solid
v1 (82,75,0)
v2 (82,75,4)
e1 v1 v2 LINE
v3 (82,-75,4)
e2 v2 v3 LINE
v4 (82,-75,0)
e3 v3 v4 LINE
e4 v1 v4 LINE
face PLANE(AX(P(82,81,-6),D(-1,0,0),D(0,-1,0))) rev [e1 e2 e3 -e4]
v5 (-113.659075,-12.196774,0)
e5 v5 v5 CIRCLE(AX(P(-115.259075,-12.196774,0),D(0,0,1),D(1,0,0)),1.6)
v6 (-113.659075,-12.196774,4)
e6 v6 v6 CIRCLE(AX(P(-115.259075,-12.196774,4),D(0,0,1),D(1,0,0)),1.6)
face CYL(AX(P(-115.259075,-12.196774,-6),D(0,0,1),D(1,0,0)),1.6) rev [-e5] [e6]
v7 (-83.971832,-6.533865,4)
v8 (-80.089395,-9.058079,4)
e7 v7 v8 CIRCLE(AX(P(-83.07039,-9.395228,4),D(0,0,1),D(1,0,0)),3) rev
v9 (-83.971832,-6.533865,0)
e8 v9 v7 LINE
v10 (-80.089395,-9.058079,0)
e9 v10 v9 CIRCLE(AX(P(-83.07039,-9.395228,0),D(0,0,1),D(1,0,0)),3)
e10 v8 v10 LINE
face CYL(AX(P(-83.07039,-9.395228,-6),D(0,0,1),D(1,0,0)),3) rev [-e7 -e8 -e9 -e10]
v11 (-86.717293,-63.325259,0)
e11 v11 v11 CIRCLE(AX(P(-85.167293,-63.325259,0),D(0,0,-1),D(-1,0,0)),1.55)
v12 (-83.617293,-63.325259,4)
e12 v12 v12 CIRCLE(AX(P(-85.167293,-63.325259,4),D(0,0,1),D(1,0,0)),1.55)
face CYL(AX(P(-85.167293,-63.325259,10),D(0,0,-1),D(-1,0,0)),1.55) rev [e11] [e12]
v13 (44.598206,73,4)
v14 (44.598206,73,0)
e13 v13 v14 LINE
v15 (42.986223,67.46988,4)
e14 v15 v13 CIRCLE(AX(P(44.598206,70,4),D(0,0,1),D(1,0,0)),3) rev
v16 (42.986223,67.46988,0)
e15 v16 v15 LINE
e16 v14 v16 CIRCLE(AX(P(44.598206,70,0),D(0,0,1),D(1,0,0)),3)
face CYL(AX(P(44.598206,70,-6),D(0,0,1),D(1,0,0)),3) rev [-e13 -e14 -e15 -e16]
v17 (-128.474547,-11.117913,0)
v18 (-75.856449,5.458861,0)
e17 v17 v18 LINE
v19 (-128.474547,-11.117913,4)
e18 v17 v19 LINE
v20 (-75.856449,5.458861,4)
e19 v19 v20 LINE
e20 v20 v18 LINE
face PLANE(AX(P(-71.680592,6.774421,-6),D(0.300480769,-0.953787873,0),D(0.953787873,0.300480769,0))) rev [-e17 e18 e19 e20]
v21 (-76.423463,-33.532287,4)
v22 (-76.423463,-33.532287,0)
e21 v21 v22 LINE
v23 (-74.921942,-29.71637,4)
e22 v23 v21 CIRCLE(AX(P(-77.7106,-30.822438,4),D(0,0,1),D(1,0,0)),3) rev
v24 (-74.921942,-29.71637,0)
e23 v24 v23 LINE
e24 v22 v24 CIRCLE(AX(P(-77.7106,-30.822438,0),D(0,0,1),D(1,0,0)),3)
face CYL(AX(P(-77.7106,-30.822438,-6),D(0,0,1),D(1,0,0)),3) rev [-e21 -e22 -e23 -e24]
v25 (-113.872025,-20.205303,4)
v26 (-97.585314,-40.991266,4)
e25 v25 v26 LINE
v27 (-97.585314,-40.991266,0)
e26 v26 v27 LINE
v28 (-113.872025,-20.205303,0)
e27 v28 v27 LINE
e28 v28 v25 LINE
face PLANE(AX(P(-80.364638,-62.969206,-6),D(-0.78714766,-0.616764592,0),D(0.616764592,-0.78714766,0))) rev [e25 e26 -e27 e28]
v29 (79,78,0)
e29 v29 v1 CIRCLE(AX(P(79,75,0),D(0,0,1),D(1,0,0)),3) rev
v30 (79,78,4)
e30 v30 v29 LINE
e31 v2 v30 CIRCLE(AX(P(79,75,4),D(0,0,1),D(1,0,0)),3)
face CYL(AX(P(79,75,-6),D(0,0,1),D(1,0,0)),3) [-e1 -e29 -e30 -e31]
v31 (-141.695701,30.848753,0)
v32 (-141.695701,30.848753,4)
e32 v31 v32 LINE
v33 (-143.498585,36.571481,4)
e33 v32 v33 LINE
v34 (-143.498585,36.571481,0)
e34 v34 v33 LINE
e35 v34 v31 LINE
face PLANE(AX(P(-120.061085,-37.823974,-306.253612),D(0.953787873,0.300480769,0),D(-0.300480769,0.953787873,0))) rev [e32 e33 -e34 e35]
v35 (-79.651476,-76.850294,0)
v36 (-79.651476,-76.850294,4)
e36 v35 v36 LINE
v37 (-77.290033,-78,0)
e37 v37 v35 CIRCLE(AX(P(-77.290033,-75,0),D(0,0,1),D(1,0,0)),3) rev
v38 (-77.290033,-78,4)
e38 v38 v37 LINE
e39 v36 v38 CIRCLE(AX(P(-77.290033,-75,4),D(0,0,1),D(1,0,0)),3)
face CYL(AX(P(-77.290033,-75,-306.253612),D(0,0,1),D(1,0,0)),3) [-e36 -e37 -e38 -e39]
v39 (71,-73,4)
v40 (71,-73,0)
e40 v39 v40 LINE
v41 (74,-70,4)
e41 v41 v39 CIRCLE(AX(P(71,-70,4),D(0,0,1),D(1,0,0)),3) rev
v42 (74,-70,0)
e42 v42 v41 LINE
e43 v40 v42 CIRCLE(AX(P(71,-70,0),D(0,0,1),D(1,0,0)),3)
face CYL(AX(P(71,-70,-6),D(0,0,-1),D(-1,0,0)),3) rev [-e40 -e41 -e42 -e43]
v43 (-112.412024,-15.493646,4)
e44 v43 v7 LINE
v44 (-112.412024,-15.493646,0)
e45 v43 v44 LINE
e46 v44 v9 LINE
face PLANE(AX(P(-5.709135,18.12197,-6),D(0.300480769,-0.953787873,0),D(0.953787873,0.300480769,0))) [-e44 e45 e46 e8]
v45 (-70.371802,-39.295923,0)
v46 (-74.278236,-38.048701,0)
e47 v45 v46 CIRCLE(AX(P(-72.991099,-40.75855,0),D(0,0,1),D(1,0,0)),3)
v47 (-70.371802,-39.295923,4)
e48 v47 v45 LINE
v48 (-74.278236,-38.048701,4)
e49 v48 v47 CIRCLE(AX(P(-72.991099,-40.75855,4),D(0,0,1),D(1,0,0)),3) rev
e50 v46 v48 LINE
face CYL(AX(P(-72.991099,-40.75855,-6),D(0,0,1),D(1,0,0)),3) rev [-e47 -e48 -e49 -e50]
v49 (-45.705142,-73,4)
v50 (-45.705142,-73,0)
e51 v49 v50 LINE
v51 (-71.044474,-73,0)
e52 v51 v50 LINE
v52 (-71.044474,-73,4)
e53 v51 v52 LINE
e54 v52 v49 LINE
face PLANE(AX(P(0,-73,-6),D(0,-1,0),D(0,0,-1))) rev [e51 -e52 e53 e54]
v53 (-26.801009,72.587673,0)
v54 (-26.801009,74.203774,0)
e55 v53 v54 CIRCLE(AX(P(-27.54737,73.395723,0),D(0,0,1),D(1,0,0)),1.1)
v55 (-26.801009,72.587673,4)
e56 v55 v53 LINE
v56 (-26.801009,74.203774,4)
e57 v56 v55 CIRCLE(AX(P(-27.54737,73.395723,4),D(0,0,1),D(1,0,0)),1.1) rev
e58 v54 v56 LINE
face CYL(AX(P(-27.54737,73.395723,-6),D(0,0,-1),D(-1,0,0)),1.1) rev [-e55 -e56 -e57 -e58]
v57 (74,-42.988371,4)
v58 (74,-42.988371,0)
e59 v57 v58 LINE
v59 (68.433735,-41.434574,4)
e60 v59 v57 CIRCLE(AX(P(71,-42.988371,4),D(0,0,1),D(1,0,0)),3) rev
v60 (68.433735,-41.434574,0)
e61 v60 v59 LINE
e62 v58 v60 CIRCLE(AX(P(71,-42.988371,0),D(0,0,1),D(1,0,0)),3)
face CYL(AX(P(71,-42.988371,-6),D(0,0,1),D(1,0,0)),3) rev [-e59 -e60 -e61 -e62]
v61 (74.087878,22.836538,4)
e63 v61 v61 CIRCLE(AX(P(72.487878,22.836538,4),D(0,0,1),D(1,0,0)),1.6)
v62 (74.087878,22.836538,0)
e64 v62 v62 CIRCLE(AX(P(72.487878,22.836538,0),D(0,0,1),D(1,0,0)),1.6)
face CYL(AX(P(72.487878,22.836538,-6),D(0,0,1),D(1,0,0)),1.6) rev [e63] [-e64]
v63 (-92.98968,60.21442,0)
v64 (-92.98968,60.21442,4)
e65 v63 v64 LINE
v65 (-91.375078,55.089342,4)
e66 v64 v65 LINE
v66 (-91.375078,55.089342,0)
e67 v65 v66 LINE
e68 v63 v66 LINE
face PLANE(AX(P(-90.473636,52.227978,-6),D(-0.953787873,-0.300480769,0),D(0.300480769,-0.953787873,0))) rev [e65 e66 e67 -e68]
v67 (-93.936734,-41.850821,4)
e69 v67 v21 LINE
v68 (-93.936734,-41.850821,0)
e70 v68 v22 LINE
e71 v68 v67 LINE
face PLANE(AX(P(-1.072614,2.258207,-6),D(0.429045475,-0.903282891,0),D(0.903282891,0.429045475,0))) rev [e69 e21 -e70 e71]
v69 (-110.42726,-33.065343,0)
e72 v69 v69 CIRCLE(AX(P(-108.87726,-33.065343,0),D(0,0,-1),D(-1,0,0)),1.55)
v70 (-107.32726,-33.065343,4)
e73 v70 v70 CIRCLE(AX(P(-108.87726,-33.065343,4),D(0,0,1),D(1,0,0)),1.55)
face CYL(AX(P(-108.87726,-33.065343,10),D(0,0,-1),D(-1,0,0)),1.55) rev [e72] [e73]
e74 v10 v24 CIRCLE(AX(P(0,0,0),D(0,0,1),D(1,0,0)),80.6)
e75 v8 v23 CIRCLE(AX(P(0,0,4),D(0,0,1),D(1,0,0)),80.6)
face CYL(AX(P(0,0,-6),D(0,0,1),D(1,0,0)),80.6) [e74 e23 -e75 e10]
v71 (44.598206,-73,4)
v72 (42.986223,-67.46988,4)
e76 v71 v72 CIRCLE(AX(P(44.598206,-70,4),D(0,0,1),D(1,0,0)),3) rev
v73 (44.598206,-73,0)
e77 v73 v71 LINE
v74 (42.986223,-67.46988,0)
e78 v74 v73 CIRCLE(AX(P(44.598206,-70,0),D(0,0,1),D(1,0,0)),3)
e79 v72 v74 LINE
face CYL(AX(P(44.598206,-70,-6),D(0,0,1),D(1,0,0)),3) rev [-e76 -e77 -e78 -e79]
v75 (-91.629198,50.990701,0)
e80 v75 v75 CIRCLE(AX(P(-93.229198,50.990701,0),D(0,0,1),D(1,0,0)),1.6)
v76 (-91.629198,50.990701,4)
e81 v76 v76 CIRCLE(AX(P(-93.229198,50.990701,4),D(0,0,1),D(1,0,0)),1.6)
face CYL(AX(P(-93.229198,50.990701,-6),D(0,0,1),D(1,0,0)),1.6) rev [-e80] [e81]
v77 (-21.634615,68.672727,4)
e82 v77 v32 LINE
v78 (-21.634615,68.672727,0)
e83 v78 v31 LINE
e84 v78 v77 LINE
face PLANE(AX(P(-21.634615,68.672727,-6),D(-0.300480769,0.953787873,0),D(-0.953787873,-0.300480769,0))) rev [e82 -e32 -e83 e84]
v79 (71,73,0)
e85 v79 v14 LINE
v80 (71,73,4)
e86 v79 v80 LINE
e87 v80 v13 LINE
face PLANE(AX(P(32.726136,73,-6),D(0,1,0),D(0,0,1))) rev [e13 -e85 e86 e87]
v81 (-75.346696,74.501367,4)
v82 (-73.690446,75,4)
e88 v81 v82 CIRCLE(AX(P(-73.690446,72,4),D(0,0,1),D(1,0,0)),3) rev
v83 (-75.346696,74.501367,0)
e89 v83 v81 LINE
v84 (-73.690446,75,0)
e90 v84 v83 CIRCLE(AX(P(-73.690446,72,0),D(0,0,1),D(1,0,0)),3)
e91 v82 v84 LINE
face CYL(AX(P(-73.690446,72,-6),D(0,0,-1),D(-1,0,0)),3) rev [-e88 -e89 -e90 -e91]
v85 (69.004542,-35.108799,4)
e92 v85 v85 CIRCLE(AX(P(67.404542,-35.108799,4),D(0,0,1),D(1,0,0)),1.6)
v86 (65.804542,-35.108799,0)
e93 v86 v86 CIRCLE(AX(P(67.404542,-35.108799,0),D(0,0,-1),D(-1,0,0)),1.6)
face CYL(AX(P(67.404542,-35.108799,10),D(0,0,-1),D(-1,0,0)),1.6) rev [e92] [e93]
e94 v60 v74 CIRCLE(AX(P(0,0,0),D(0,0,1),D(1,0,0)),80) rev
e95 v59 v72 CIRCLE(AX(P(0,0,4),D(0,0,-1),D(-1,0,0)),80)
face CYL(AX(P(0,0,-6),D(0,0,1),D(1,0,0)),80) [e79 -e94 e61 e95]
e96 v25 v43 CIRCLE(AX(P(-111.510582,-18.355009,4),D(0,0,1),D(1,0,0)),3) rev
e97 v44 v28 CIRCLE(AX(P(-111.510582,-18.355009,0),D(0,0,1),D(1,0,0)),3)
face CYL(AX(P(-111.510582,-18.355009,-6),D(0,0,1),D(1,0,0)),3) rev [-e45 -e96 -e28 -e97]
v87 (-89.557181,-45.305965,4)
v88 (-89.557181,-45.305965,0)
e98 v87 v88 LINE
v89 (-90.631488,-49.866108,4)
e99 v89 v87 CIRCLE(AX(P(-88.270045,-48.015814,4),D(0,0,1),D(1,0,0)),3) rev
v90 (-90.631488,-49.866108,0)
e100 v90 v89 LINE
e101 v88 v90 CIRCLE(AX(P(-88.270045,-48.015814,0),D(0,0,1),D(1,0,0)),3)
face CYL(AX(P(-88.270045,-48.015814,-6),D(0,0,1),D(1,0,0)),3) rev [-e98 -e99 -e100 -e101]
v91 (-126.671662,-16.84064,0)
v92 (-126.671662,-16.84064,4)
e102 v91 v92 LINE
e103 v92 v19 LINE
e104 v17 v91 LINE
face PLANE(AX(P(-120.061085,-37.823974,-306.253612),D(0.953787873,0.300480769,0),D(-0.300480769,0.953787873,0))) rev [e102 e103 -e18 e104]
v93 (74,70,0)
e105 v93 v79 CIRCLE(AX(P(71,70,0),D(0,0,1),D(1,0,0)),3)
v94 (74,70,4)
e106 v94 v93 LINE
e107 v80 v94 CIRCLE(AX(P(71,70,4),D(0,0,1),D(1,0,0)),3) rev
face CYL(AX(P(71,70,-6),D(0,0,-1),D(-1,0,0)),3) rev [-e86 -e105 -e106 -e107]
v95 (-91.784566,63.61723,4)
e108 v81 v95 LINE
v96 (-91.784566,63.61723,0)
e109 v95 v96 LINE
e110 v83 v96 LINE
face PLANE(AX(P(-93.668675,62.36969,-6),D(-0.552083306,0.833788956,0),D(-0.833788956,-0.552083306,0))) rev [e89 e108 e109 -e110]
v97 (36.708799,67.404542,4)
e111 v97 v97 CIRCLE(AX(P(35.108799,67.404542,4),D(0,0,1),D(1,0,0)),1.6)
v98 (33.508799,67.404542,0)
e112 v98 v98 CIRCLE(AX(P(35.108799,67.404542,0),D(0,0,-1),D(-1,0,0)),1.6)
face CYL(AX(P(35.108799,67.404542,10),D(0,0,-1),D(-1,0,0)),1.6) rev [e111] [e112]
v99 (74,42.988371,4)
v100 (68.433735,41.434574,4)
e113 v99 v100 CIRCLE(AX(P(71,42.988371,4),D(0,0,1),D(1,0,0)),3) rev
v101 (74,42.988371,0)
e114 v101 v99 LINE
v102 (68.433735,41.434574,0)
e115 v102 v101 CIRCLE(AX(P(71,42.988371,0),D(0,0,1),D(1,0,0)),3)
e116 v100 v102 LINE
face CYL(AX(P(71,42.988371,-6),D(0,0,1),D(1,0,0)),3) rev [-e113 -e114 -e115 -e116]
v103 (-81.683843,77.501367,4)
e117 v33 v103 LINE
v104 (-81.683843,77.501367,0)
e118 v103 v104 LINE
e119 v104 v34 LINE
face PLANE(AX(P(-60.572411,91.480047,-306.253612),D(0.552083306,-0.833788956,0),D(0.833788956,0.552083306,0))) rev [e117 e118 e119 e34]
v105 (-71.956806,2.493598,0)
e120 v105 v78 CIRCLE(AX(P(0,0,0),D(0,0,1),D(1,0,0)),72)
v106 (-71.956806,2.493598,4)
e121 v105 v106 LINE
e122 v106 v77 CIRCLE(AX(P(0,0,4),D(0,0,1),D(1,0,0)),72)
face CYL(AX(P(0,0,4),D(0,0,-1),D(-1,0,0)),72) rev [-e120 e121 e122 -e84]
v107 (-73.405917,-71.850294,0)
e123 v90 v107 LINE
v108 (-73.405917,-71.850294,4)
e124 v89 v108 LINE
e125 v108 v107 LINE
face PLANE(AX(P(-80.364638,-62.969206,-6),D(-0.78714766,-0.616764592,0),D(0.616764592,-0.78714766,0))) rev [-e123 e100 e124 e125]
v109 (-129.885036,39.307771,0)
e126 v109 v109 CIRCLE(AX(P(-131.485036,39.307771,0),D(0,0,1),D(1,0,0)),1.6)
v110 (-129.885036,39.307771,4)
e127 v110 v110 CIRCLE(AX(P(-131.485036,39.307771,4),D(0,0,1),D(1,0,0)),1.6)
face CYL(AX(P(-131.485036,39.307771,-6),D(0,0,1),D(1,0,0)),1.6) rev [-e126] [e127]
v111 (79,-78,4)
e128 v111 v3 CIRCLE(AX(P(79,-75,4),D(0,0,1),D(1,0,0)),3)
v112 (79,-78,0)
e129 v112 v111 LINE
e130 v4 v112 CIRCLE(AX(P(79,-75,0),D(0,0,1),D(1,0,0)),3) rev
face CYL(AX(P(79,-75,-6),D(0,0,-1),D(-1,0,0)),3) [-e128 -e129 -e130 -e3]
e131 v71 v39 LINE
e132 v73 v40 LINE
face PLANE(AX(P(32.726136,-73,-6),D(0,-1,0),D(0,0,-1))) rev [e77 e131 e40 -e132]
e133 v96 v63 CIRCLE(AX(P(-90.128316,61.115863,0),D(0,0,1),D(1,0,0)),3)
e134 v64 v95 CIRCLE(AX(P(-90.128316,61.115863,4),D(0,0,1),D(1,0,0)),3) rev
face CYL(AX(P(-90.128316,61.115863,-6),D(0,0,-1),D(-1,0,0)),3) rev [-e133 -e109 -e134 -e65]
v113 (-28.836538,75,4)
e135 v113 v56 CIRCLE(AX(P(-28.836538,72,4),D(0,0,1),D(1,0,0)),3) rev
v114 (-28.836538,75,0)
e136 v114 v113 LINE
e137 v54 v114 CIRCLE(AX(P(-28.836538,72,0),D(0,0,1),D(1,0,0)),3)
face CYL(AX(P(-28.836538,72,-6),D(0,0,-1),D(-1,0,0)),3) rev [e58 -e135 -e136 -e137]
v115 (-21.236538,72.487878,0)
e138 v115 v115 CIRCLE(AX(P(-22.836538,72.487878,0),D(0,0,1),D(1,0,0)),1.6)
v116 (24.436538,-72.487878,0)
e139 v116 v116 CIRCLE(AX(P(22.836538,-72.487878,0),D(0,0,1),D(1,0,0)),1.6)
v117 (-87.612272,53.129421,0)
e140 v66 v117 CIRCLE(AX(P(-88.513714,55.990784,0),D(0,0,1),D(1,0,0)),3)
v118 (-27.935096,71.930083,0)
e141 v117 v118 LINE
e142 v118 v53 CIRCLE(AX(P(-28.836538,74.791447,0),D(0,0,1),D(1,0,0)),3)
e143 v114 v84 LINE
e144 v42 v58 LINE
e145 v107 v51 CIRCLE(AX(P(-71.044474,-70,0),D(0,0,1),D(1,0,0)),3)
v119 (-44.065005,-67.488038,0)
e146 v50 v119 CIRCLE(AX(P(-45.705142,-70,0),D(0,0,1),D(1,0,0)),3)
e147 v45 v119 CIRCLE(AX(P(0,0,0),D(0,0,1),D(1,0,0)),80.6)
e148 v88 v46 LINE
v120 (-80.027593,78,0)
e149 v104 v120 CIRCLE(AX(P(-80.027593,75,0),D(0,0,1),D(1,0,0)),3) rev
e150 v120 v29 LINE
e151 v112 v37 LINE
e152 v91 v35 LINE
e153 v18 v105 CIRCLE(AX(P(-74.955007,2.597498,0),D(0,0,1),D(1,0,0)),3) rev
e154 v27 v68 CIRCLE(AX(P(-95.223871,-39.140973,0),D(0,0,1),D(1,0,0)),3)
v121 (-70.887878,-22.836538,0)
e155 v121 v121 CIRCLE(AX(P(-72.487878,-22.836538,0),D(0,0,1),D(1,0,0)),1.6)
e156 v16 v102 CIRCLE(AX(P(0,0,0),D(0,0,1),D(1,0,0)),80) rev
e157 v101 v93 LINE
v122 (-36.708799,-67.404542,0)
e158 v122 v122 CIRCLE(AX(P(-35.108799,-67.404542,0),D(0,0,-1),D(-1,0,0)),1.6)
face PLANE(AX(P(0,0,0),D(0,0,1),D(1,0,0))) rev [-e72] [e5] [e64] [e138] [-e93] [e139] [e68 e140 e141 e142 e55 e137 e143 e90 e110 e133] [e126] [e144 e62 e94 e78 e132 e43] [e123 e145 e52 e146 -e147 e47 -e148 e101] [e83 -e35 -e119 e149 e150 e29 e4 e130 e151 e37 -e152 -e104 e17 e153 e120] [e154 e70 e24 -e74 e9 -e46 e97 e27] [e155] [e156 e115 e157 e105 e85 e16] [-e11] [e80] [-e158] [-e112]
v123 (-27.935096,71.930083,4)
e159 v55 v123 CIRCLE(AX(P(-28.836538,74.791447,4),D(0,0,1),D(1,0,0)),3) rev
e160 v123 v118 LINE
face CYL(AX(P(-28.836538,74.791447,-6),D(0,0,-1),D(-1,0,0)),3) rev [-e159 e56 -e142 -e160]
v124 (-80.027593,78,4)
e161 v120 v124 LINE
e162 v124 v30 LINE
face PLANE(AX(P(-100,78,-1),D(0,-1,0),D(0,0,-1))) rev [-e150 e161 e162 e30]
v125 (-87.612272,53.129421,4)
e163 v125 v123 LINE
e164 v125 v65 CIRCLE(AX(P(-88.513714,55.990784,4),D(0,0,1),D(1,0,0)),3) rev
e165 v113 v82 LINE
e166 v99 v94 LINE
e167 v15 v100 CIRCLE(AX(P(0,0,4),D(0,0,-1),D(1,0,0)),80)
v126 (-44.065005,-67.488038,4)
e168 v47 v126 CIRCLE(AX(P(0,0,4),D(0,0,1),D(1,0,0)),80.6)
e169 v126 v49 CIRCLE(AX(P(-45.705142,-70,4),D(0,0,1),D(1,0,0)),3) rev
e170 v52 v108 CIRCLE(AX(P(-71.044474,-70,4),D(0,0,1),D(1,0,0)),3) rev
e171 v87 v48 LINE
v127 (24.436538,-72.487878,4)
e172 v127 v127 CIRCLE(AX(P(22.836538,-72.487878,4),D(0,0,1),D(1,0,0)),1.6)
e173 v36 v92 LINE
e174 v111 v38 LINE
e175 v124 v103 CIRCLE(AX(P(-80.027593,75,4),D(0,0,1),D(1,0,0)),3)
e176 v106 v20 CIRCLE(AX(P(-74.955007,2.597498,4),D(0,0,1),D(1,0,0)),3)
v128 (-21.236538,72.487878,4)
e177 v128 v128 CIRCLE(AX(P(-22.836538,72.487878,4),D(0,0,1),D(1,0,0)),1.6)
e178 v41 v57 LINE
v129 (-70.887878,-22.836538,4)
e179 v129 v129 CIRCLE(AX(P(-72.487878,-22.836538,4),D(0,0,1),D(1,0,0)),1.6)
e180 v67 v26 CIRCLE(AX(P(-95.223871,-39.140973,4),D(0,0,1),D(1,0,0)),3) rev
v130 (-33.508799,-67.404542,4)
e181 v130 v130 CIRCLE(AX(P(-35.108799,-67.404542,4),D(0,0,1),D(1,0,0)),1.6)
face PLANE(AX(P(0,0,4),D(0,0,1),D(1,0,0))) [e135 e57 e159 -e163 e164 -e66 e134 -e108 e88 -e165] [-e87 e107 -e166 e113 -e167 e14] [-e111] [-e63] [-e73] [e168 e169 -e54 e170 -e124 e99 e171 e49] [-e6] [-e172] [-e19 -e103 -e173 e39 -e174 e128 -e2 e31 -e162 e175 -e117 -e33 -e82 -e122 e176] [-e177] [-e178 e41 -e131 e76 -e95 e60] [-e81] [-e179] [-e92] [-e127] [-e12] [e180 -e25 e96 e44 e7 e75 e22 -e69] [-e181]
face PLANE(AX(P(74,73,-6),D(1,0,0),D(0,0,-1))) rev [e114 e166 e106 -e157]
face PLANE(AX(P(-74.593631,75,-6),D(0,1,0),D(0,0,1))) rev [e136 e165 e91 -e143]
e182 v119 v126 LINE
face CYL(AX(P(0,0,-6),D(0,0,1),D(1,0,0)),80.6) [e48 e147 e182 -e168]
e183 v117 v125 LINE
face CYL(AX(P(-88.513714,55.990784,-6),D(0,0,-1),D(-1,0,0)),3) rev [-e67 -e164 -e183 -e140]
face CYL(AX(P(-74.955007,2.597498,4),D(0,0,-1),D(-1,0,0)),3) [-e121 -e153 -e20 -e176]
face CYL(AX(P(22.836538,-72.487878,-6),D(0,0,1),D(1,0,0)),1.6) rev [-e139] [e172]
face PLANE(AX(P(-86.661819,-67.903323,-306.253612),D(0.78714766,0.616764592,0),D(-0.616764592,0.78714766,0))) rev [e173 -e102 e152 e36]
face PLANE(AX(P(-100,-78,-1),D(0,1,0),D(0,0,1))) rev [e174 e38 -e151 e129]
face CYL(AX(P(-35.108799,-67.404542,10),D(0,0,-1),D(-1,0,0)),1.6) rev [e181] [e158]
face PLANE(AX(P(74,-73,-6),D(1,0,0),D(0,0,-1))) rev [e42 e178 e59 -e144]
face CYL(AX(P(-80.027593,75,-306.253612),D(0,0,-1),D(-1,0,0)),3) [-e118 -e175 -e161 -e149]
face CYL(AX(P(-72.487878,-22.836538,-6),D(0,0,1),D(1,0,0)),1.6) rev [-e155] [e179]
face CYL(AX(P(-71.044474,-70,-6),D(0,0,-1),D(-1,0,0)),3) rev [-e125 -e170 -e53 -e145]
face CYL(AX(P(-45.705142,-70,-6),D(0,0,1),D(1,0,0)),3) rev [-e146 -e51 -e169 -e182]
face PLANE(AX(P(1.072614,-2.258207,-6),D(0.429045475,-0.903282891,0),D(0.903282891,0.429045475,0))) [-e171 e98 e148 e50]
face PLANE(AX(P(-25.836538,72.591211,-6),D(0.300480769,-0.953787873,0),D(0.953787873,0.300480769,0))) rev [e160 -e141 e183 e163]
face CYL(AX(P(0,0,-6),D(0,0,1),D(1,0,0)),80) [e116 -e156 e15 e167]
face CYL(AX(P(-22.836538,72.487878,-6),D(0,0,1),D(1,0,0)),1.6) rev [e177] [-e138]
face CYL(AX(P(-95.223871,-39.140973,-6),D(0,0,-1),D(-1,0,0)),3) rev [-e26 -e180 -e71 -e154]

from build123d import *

# Parameters (mm, degrees)
SKETCH_1_W           = 232.8
SKETCH_1_H           = 162
SKETCH_1_R           = 72
EXTRUDE_1_DEPTH      = 4
CUT_EXTRUDE_START    = -10
CUT_EXTRUDE_2_DEPTH  = 10
EXTRUDE_2_DEPTH      = 4
CUT_EXTRUDE_3_DEPTH  = 10
SKETCH_5_R           = 1.6
CUT_EXTRUDE_4_DEPTH  = 10
SKETCH_9_R           = 1.6
CUT_EXTRUDE_5_DEPTH  = 10
SKETCH_10_R          = 1.6
CUT_EXTRUDE_6_DEPTH  = 10
SKETCH_11_R          = 1.6
CUT_EXTRUDE_7_DEPTH  = 10
CUT_EXTRUDE_8_DEPTH  = 10
FILLET_1_R           = 3
FILLET_2_R           = 1.1
FILLET_3_R           = 3
CUT_EXTRUDE_9_DEPTH  = 10
FILLET_4_R           = 3
SKETCH_14_W          = 34.4
SKETCH_14_H          = 162
CUT_EXTRUDE_10_DEPTH = 10
CUT_EXTRUDE_11_DEPTH = 10
FILLET_5_R           = 3
SKETCH_16_R          = 1.55
CUT_EXTRUDE_12_DEPTH = 10
SKETCH_17_W          = 200
SKETCH_17_H          = 10
CUT_EXTRUDE_13_DEPTH = 5
FILLET_6_R           = 3


with BuildPart() as part:
    # 草图1 → 凸台-拉伸1 (new body)
    with BuildSketch(Plane.XY):
        Rectangle(SKETCH_1_W, SKETCH_1_H)
        Circle(SKETCH_1_R, mode=Mode.SUBTRACT)
    extrude(amount=EXTRUDE_1_DEPTH)

    # 草图3 → 切除-拉伸2 (cut)
    with BuildSketch(Plane.XY.offset(4).offset(CUT_EXTRUDE_START)):
        with BuildLine():
            Line((-21.634615385, 68.67272688), (-116.4, 38.817895988))
            Line((-116.4, 38.817895988), (-116.4, -7.313954951))
            Line((-116.4, -7.313954951), (-71.680591647, 6.774421088))
            ThreePointArc((-71.680591647, 6.774421088), (-55.989124219, 45.268288781), (-21.634615385, 68.67272688))
        make_face()
    extrude(amount=CUT_EXTRUDE_2_DEPTH, mode=Mode.SUBTRACT)

    # 草图6 → 凸台-拉伸2 (add)
    with BuildSketch(Plane.XY.offset(4)):
        Polygon((-126.671662246, -16.840640315), (-116.4, -29.949880057), (-116.4, -7.313954951), (-128.474546862, -11.117913075), align=None)
        Polygon((-116.4, 38.817895988), (-116.4, 54.514482194), (-143.498585323, 36.571480592), (-141.695700708, 30.848753352), align=None)
    extrude(amount=-EXTRUDE_2_DEPTH)

    # 草图7 → 切除-拉伸3 (cut)
    with BuildSketch(Plane.XY.offset(4)):
        Polygon((-116.4, -29.949880057), (-76.4, -81), (-116.4, -81), align=None)
        Polygon((-116.4, 54.514482194), (-76.4, 81), (-116.4, 81), align=None)
    extrude(amount=-CUT_EXTRUDE_3_DEPTH, mode=Mode.SUBTRACT)

    # 草图5 → 切除-拉伸4 (cut)
    with BuildSketch(Plane.XY.offset(4)):
        with Locations((-115.25907459, -12.196774271)):
            Circle(SKETCH_5_R)
        with Locations((-131.485036128, 39.307770889)):
            Circle(SKETCH_5_R)
    extrude(amount=-CUT_EXTRUDE_4_DEPTH, mode=Mode.SUBTRACT)

    # 草图9 → 切除-拉伸5 (cut)
    with BuildSketch(Plane.XY.offset(4)):
        with Locations((-22.836538462, 72.487878374)):
            Circle(SKETCH_9_R)
        with Locations((72.487878374, 22.836538462)):
            Circle(SKETCH_9_R)
        with Locations((22.836538462, -72.487878374)):
            Circle(SKETCH_9_R)
        with Locations((-72.487878374, -22.836538462)):
            Circle(SKETCH_9_R)
    extrude(amount=-CUT_EXTRUDE_5_DEPTH, mode=Mode.SUBTRACT)

    # 草图10 → 切除-拉伸6 (cut)
    with BuildSketch(Plane.XY.offset(4)):
        with Locations((-93.229198124, 50.99070111)):
            Circle(SKETCH_10_R)
    extrude(amount=-CUT_EXTRUDE_6_DEPTH, mode=Mode.SUBTRACT)

    # 草图11 → 切除-拉伸7 (cut)
    with BuildSketch(Plane(origin=(0, 0, 0), x_dir=(-1, 0, 0), z_dir=(0, 0, -1))):
        with Locations((-35.108799147, 67.404541557)):
            Circle(SKETCH_11_R)
        with Locations((-67.404541557, -35.108799147)):
            Circle(SKETCH_11_R)
        with Locations((35.108799147, -67.404541557)):
            Circle(SKETCH_11_R)
    extrude(amount=-CUT_EXTRUDE_7_DEPTH, mode=Mode.SUBTRACT)

    # 草图12 → 切除-拉伸8 (cut)
    with BuildSketch(Plane.XY.offset(4)):
        Polygon((-93.668674526, 62.369689763), (-74.593630829, 75), (-25.836538462, 75), (-25.836538462, 72.5912113), (-90.473635724, 52.227978291), align=None)
    extrude(amount=-CUT_EXTRUDE_8_DEPTH, mode=Mode.SUBTRACT)

    # 圆角1
    # the kernel refuses this fillet: 3 mm, written as the material it adds along each edge
    with BuildSketch(Plane(origin=(-25.836538462, 75, 4), x_dir=(0, -1, 0), z_dir=(0, 0, -1)), Plane(origin=(-90.473635724, 52.227978291, 4), x_dir=(-0.3004807692307691, 0.95378787333583, 0), z_dir=(0, 0, -1))) as fillet_1_piece_1:
        with BuildLine():
            CenterArc((FILLET_1_R, FILLET_1_R), FILLET_1_R, 180, 90)
            Line((0, FILLET_1_R), (0, 0))
            Line((0, 0), (FILLET_1_R, 0))
        make_face()
    extrude(amount=4)
    with BuildSketch(Plane(origin=(-25.836538462, 72.5912113, 4), x_dir=(-0.9537878733358296, -0.30048076923076983, 0), z_dir=(0, 0, -1))) as fillet_1_piece_2:
        with BuildLine():
            CenterArc((FILLET_1_R * 0.733411747334, FILLET_1_R), FILLET_1_R, 197.486481518, 72.513518482)
            Line((-FILLET_1_R * 0.220376126002, FILLET_1_R * 0.699519230769), (0, 0))
            Line((0, 0), (FILLET_1_R * 0.733411747334, 0))
        make_face()
    extrude(amount=4)
    with BuildSketch(Plane(origin=(-93.668674526, 62.369689763, 4), x_dir=(0.3004807692307694, -0.95378787333583, 0), z_dir=(0, 0, -1))) as fillet_1_piece_3:
        with BuildLine():
            CenterArc((FILLET_1_R * 0.753231578374, -FILLET_1_R), FILLET_1_R, 90, 73.976427328)
            Line((-FILLET_1_R * 0.207916633287, -FILLET_1_R * 0.72396718452), (0, 0))
            Line((0, 0), (FILLET_1_R * 0.753231578374, 0))
        make_face()
    extrude(amount=4)
    with BuildSketch(Plane(origin=(-74.593630829, 75, 4), x_dir=(1, 0, 0), z_dir=(0, 0, -1))) as fillet_1_piece_4:
        with BuildLine():
            CenterArc((FILLET_1_R * 0.30106152849, FILLET_1_R), FILLET_1_R, 236.48994581, 33.51005419)
            Line((-FILLET_1_R * 0.251021777541, FILLET_1_R * 0.166211043968), (0, 0))
            Line((0, 0), (FILLET_1_R * 0.30106152849, 0))
        make_face()
    extrude(amount=4)

    # 圆角2
    fillet_2_edges = [part.edges().sort_by_distance(p)[0] for p in [
        (-26.180986438, 73.395723271, 2),
    ]]
    fillet(fillet_2_edges, radius=FILLET_2_R)

    # 圆角3
    fillet_3_edges = [part.edges().sort_by_distance(p)[0] for p in [
        (-71.680591647, 6.774421088, 2),
        (-76.4, -81, 2),
        (-76.4, 81, 2),
    ]]
    fillet(fillet_3_edges, radius=FILLET_3_R)

    # 草图13 → 切除-拉伸9 (cut)
    with BuildSketch(Plane.XY.offset(4)):
        with BuildLine():
            Line((-71.696957036, -36.822633688), (-92.944059946, -46.914680662))
            Line((-92.944059946, -46.914680662), (-72.505072248, -73))
            Line((-72.505072248, -73), (-34.166650407, -73))
            ThreePointArc((-34.166650407, -73), (-55.937253271, -58.029162466), (-71.696957036, -36.822633688))
        make_face()
        with BuildLine():
            Line((-80.417945117, -5.414250016), (-116.543877682, -16.79534251))
            Line((-116.543877682, -16.79534251), (-96.104889984, -42.880661848))
            Line((-96.104889984, -42.880661848), (-73.842184412, -32.306219235))
            ThreePointArc((-73.842184412, -32.306219235), (-78.293303626, -19.144675692), (-80.417945117, -5.414250016))
        make_face()
    extrude(amount=-CUT_EXTRUDE_9_DEPTH, mode=Mode.SUBTRACT)

    # 圆角4
    fillet_4_edges = [part.edges().sort_by_distance(p)[0] for p in [
        (-80.417945117, -5.414250016, 2),
        (-73.842184412, -32.306219235, 2),
        (-96.104889984, -42.880661848, 2),
        (-116.543877682, -16.79534251, 2),
        (-71.696957036, -36.822633688, 2),
        (-34.166650407, -73, 2),
        (-72.505072248, -73, 2),
        (-92.944059946, -46.914680662, 2),
    ]]
    fillet(fillet_4_edges, radius=FILLET_4_R)

    # 草图14 → 切除-拉伸10 (cut)
    with BuildSketch(Plane.XY.offset(4)):
        with Locations((99.2, 0)):
            Rectangle(SKETCH_14_W, SKETCH_14_H)
    extrude(amount=-CUT_EXTRUDE_10_DEPTH, mode=Mode.SUBTRACT)

    # 草图15 → 切除-拉伸11 (cut)
    with BuildSketch(Plane.XY.offset(4)):
        with BuildLine():
            Line((32.726136344, 73), (74, 73))
            Line((74, 73), (74, 30.397368307))
            ThreePointArc((74, 30.397368307), (57.457489516, 55.665401269), (32.726136344, 73))
        make_face()
        with BuildLine():
            Line((74, -73), (74, -30.397368307))
            ThreePointArc((74, -30.397368307), (57.457489516, -55.665401269), (32.726136344, -73))
            Line((32.726136344, -73), (74, -73))
        make_face()
    extrude(amount=-CUT_EXTRUDE_11_DEPTH, mode=Mode.SUBTRACT)

    # 圆角5
    fillet_5_edges = [part.edges().sort_by_distance(p)[0] for p in [
        (82, 81, 2),
        (82, -81, 2),
        (74, 30.397368307, 2),
        (32.726136344, 73, 2),
        (74, 73, 2),
        (32.726136344, -73, 2),
        (74, -30.397368307, 2),
        (74, -73, 2),
    ]]
    fillet(fillet_5_edges, radius=FILLET_5_R)

    # 草图16 → 切除-拉伸12 (cut)
    with BuildSketch(Plane(origin=(0, 0, 0), x_dir=(-1, 0, 0), z_dir=(0, 0, -1))):
        with Locations((108.877259832, -33.065343142)):
            Circle(SKETCH_16_R)
        with Locations((85.167293187, -63.325259168)):
            Circle(SKETCH_16_R)
    extrude(amount=-CUT_EXTRUDE_12_DEPTH, mode=Mode.SUBTRACT)

    # 草图17 → 切除-拉伸13 (cut, symmetric)
    with BuildSketch(Plane.XY.offset(4)):
        with Locations((0, 83)):
            Rectangle(SKETCH_17_W, SKETCH_17_H)
        with Locations((0, -83)):
            Rectangle(SKETCH_17_W, SKETCH_17_H)
    extrude(amount=CUT_EXTRUDE_13_DEPTH, both=True, mode=Mode.SUBTRACT)

    # 圆角6
    fillet_6_edges = [part.edges().sort_by_distance(p)[0] for p in [
        (82, -78, 2),
        (82, 78, 2),
        (-80.930777947, 78, 2),
        (-78.750631108, -78, 2),
    ]]
    fillet(fillet_6_edges, radius=FILLET_6_R)


solid = part.part
